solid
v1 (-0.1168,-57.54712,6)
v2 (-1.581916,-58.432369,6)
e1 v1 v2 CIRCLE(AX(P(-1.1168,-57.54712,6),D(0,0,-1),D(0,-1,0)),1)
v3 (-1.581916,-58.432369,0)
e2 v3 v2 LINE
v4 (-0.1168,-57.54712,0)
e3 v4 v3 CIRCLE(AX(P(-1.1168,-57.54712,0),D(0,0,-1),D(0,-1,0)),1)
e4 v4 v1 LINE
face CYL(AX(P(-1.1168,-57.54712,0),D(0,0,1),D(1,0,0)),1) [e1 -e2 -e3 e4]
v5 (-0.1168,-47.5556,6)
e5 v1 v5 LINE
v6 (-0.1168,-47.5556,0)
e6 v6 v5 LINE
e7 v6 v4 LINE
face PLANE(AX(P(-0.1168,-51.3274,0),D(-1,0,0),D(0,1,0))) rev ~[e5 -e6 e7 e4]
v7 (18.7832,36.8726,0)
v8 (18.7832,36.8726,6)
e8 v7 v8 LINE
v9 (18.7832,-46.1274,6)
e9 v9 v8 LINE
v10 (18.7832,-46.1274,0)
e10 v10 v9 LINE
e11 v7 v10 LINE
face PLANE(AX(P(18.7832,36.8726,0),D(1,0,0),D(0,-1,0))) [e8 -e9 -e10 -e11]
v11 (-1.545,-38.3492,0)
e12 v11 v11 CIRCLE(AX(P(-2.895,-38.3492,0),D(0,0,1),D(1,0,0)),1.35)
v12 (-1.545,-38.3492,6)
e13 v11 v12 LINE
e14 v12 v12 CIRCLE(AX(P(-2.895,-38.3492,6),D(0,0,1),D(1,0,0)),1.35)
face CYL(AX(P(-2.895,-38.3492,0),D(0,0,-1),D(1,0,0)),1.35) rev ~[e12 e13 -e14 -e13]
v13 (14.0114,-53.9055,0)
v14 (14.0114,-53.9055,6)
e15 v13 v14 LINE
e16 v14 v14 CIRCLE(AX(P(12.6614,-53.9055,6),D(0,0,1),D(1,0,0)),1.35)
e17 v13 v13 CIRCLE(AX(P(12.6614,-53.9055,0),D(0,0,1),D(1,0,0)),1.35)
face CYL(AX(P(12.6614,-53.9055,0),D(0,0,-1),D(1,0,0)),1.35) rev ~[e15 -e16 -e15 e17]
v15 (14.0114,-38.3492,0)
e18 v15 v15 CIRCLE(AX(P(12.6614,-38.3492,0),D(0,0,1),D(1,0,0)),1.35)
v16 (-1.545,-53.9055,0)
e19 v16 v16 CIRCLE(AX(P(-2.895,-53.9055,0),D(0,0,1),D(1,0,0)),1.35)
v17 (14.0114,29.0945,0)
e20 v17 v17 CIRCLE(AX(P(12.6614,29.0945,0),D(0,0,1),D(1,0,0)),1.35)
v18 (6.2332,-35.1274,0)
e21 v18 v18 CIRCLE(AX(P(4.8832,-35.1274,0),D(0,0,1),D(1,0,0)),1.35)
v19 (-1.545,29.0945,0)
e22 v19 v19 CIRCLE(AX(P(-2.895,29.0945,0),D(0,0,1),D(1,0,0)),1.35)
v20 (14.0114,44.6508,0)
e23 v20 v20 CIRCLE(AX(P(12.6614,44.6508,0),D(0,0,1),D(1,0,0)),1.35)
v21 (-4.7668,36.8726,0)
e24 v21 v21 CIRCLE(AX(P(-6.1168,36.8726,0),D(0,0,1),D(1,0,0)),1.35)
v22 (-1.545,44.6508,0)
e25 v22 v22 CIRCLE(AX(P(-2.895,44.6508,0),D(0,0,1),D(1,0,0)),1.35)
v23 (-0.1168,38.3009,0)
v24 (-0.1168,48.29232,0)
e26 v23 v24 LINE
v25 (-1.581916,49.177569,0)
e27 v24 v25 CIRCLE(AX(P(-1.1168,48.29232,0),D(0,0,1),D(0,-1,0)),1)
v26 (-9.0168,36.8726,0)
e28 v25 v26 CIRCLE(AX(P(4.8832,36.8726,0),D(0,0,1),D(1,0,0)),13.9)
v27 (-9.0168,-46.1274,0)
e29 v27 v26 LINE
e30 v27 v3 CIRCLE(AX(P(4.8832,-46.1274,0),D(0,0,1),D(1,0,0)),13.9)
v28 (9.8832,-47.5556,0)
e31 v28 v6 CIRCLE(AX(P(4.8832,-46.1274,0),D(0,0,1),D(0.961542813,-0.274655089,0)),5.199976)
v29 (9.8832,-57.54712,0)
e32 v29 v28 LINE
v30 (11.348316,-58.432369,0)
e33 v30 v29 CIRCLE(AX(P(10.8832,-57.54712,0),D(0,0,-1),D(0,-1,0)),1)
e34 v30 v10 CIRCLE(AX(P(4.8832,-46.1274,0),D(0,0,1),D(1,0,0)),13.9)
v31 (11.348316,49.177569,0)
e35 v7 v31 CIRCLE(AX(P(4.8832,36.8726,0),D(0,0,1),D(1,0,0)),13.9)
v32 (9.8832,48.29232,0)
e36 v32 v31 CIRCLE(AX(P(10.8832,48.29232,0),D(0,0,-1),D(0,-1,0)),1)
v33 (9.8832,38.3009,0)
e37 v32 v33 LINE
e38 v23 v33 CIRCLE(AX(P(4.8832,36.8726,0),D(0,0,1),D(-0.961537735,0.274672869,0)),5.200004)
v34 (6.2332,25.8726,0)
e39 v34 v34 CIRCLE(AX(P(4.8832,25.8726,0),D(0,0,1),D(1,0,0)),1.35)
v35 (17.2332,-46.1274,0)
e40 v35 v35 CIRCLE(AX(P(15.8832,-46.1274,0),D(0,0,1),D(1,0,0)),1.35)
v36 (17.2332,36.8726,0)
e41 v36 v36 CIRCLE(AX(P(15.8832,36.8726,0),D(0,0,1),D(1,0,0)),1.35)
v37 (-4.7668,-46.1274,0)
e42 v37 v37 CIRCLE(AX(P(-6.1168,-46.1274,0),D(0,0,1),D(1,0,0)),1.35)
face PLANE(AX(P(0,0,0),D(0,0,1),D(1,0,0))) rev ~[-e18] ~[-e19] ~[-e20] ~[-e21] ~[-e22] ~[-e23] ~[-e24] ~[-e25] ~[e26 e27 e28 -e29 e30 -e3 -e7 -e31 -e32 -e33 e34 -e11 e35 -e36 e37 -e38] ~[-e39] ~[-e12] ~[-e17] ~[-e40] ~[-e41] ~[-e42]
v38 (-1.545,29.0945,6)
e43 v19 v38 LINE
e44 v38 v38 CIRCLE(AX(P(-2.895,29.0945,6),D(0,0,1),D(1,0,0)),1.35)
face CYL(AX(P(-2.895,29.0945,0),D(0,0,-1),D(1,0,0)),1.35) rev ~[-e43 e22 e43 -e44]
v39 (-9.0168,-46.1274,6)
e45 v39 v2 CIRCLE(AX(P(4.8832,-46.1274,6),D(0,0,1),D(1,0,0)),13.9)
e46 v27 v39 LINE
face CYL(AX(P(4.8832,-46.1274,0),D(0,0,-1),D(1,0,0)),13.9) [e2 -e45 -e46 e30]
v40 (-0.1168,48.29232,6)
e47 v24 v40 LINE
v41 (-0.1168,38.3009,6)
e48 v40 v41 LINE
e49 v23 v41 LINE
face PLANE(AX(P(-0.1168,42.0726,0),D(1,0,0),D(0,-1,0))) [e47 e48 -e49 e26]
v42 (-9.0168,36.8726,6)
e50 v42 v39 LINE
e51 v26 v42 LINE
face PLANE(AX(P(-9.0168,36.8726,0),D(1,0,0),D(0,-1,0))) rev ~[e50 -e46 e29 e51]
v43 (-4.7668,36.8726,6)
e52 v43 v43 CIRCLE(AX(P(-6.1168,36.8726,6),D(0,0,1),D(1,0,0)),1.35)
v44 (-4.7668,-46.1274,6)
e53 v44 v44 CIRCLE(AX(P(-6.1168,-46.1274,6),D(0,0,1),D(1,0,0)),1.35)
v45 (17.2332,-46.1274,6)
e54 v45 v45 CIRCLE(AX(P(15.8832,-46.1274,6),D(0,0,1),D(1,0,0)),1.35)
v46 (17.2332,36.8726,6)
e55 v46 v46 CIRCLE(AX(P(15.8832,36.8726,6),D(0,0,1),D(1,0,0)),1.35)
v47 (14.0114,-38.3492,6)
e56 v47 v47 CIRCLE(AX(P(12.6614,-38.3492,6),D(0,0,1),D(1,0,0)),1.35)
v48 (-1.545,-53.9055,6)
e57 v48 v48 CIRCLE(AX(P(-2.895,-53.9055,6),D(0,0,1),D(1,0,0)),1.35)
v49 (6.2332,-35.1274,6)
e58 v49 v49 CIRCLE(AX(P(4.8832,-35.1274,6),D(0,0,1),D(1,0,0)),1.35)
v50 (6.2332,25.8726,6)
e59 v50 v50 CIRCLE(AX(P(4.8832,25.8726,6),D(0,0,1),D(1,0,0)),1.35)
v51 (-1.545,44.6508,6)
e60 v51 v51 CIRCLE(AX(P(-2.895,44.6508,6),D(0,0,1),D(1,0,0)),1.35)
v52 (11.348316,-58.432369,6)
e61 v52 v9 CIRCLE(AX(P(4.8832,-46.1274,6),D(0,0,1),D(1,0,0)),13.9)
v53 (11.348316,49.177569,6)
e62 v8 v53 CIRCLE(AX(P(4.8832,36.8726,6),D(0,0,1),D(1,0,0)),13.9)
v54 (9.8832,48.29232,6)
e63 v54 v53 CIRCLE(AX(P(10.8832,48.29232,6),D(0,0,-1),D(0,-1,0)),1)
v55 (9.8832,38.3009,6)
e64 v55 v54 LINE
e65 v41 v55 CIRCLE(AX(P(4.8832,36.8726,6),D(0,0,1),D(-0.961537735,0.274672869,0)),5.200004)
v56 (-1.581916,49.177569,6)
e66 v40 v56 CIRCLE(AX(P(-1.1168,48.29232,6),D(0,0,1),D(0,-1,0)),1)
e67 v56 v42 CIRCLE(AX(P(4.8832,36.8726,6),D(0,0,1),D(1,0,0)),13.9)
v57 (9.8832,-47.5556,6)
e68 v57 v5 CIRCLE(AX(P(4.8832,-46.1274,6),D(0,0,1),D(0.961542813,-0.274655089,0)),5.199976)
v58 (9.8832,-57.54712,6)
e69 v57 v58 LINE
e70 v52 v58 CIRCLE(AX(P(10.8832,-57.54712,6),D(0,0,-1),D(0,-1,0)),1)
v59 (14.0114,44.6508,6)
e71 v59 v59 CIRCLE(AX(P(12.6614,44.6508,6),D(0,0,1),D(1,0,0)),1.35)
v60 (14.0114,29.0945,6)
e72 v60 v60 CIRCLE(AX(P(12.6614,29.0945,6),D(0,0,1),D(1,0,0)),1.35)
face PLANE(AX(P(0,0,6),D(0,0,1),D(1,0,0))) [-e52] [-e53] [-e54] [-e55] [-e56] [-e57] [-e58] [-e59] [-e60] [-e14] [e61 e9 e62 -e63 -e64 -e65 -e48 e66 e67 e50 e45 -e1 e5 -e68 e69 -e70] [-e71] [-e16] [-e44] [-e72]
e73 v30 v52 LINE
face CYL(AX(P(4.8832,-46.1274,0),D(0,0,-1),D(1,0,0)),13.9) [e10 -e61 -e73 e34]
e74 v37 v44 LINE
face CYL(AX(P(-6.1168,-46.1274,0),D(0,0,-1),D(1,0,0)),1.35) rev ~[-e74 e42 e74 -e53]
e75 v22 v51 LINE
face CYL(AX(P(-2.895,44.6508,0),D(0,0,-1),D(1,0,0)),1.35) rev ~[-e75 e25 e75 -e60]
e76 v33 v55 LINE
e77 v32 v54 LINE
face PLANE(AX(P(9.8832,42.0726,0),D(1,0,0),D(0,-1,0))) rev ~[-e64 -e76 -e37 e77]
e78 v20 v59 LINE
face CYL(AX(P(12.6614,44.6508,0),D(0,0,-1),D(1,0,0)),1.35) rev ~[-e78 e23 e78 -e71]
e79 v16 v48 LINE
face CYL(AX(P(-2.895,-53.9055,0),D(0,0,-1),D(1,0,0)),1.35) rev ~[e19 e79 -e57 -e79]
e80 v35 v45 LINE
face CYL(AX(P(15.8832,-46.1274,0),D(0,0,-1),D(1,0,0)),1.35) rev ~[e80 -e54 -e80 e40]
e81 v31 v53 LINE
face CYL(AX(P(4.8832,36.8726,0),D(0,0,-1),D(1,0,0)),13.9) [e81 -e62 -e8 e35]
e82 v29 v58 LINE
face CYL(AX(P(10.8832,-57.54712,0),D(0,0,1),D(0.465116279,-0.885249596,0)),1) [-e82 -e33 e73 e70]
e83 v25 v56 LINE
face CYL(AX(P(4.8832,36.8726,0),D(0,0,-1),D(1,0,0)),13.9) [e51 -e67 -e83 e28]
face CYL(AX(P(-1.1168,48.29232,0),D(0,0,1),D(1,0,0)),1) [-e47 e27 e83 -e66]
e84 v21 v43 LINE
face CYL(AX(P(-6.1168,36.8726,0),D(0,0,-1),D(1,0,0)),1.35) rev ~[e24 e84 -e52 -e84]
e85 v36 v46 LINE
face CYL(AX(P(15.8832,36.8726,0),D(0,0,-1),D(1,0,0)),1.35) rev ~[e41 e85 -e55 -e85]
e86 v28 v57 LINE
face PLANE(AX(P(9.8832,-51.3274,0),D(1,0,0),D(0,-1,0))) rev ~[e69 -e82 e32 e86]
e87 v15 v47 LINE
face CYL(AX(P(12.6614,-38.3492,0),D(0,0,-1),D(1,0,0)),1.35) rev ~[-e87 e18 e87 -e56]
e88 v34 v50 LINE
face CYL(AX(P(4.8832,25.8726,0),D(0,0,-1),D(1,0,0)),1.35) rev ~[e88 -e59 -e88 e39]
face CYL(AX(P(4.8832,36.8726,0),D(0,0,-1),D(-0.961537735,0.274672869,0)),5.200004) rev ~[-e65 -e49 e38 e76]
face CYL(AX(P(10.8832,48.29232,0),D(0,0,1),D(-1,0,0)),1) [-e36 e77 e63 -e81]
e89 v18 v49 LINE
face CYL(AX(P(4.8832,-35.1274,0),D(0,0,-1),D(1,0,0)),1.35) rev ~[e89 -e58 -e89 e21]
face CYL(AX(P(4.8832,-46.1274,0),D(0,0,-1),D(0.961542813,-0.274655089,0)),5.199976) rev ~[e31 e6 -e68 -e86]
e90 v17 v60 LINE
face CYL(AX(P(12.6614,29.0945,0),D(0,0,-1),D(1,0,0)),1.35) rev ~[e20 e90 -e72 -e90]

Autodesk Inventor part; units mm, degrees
ref_plane "YZ Plane" through (0, 0, 0) normal (1, 0, 0) x (0, 1, 0)
ref_plane "XZ Plane" through (0, 0, 0) normal (0, 1, 0) x (-1, 0, 0)
ref_plane "XY Plane" through (0, 0, 0) normal (0, 0, 1) x (1, 0, 0)
sketch "스케치1" plane through (0, 0, 0) normal (0, 0, 1) x (1, 0, 0)
  circle A0 centre (4.8832, 36.8726) radius 5
  circle A1 centre (4.8832, 47.8726) radius 1.55
  circle A2 centre (4.8832, 36.8726) radius 5
  arc A3 (-0.1168, 38.3009) -> (9.8832, 38.3009) centre (4.8832, 36.8726) ccw
  line L0 (4.8832, 42.0726) -> (9.8832, 42.0726)
  line L1 (4.8832, 42.0726) -> (-0.1168, 42.0726)
  circle A4 centre (4.8832, 36.8726) radius 13.9
  line L2 (9.8832, 42.0726) -> (9.8832, 49.8422)
  line L3 (-0.1168, 42.0726) -> (-0.1168, 49.8422)
  line L4 (9.8832, 42.0726) -> (9.8832, 38.3009)
  line L5 (-0.1168, 42.0726) -> (-0.1168, 38.3009)
  circle A5 centre (4.8832, 36.8726) radius 1.5
  line L6 (18.7832, 36.8726) -> (18.7832, -4.6274)
  line L7 (-9.0168, 36.8726) -> (-9.0168, -4.6274)
  arc A6 (-0.1168, 49.8422) -> (-9.0168, 36.8726) centre (4.8832, 36.8726) ccw
  arc A7 (18.7832, 36.8726) -> (9.8832, 49.8422) centre (4.8832, 36.8726) ccw
  line L8 (-9.0168, -4.6274) -> (18.7832, -4.6274)
  circle A8 centre (4.8832, 36.8726) radius 13.9
  line L9 (-9.0168, -46.1274) -> (-9.0168, -4.6274)
  line L10 (18.7832, -46.1274) -> (18.7832, -4.6274)
  line L11 (18.7832, -4.6274) -> (-9.0168, -4.6274)
  circle A9 centre (-2.895, 44.6508) radius 1.35
  circle A10 centre (-6.1168, 36.8726) radius 1.35
  circle A11 centre (-2.895, 29.0945) radius 1.35
  circle A12 centre (4.8832, 25.8726) radius 1.35
  circle A13 centre (12.6614, 29.0945) radius 1.35
  circle A14 centre (15.8832, 36.8726) radius 1.35
  circle A15 centre (12.6614, 44.6508) radius 1.35
  circle A16 centre (4.8832, -46.1274) radius 5
  circle A17 centre (4.8832, -57.1274) radius 1.55
  circle A18 centre (4.8832, -46.1274) radius 5
  arc A19 (9.8832, -47.5556) -> (-0.1168, -47.5556) centre (4.8832, -46.1274) ccw
  line L12 (4.8832, -51.3274) -> (-0.1168, -51.3274)
  line L13 (4.8832, -51.3274) -> (9.8832, -51.3274)
  line L14 (-0.1168, -51.3274) -> (-0.1168, -59.0969)
  line L15 (9.8832, -51.3274) -> (9.8832, -59.0969)
  line L16 (-0.1168, -51.3274) -> (-0.1168, -47.5556)
  line L17 (9.8832, -51.3274) -> (9.8832, -47.5556)
  circle A20 centre (4.8832, -46.1274) radius 1.5
  circle A21 centre (12.6614, -53.9055) radius 1.35
  circle A22 centre (15.8832, -46.1274) radius 1.35
  circle A23 centre (12.6614, -38.3492) radius 1.35
  circle A24 centre (4.8832, -35.1274) radius 1.35
  circle A25 centre (-2.895, -38.3492) radius 1.35
  circle A26 centre (-6.1168, -46.1274) radius 1.35
  circle A27 centre (-2.895, -53.9055) radius 1.35
  circle A28 centre (4.8832, -46.1274) radius 13.9
  point P0 (0, 0)
  point P1 (18.7832, -4.6274)
  point P2 (18.7832, -46.1274)
  dimension "d0" = 0.2
  dimension "d8" = 41.5
  dimension "d9" = 41.5
  dimension "d13" = 41.5
  dimension "d14" = 41.5
  dimension "d15" = 2.7
  dimension "d16" = 2.7
  dimension "d17" = 2.7
  dimension "d18" = 2.7
  dimension "d19" = 2.7
  dimension "d20" = 2.7
  dimension "d21" = 2.7
  dimension "d24" = 0.2
  dimension "d25" = 2.7
  dimension "d26" = 2.7
  dimension "d27" = 2.7
  dimension "d28" = 2.7
  dimension "d29" = 2.7
  dimension "d30" = 2.7
  dimension "d31" = 2.7
  dimension "d32" = 27.8
extrude "돌출1" add sketch "스케치1" along normal blind 6 contours A3 L4 L2 A4 L3 L5 | A4 L6 L8 L7 | L8 L10 A28 L9 | A28 L15 L17 A19 L16 L14
fillet "모깎기1" radius 1 4 edges at (-0.1168, 49.8422, 3) (9.8832, 49.8422, 3) (-0.1168, -59.0969, 3) (9.8832, -59.0969, 3)
properties part number "frame_ankle_to_knee1" material "PMMA 플라스틱"
